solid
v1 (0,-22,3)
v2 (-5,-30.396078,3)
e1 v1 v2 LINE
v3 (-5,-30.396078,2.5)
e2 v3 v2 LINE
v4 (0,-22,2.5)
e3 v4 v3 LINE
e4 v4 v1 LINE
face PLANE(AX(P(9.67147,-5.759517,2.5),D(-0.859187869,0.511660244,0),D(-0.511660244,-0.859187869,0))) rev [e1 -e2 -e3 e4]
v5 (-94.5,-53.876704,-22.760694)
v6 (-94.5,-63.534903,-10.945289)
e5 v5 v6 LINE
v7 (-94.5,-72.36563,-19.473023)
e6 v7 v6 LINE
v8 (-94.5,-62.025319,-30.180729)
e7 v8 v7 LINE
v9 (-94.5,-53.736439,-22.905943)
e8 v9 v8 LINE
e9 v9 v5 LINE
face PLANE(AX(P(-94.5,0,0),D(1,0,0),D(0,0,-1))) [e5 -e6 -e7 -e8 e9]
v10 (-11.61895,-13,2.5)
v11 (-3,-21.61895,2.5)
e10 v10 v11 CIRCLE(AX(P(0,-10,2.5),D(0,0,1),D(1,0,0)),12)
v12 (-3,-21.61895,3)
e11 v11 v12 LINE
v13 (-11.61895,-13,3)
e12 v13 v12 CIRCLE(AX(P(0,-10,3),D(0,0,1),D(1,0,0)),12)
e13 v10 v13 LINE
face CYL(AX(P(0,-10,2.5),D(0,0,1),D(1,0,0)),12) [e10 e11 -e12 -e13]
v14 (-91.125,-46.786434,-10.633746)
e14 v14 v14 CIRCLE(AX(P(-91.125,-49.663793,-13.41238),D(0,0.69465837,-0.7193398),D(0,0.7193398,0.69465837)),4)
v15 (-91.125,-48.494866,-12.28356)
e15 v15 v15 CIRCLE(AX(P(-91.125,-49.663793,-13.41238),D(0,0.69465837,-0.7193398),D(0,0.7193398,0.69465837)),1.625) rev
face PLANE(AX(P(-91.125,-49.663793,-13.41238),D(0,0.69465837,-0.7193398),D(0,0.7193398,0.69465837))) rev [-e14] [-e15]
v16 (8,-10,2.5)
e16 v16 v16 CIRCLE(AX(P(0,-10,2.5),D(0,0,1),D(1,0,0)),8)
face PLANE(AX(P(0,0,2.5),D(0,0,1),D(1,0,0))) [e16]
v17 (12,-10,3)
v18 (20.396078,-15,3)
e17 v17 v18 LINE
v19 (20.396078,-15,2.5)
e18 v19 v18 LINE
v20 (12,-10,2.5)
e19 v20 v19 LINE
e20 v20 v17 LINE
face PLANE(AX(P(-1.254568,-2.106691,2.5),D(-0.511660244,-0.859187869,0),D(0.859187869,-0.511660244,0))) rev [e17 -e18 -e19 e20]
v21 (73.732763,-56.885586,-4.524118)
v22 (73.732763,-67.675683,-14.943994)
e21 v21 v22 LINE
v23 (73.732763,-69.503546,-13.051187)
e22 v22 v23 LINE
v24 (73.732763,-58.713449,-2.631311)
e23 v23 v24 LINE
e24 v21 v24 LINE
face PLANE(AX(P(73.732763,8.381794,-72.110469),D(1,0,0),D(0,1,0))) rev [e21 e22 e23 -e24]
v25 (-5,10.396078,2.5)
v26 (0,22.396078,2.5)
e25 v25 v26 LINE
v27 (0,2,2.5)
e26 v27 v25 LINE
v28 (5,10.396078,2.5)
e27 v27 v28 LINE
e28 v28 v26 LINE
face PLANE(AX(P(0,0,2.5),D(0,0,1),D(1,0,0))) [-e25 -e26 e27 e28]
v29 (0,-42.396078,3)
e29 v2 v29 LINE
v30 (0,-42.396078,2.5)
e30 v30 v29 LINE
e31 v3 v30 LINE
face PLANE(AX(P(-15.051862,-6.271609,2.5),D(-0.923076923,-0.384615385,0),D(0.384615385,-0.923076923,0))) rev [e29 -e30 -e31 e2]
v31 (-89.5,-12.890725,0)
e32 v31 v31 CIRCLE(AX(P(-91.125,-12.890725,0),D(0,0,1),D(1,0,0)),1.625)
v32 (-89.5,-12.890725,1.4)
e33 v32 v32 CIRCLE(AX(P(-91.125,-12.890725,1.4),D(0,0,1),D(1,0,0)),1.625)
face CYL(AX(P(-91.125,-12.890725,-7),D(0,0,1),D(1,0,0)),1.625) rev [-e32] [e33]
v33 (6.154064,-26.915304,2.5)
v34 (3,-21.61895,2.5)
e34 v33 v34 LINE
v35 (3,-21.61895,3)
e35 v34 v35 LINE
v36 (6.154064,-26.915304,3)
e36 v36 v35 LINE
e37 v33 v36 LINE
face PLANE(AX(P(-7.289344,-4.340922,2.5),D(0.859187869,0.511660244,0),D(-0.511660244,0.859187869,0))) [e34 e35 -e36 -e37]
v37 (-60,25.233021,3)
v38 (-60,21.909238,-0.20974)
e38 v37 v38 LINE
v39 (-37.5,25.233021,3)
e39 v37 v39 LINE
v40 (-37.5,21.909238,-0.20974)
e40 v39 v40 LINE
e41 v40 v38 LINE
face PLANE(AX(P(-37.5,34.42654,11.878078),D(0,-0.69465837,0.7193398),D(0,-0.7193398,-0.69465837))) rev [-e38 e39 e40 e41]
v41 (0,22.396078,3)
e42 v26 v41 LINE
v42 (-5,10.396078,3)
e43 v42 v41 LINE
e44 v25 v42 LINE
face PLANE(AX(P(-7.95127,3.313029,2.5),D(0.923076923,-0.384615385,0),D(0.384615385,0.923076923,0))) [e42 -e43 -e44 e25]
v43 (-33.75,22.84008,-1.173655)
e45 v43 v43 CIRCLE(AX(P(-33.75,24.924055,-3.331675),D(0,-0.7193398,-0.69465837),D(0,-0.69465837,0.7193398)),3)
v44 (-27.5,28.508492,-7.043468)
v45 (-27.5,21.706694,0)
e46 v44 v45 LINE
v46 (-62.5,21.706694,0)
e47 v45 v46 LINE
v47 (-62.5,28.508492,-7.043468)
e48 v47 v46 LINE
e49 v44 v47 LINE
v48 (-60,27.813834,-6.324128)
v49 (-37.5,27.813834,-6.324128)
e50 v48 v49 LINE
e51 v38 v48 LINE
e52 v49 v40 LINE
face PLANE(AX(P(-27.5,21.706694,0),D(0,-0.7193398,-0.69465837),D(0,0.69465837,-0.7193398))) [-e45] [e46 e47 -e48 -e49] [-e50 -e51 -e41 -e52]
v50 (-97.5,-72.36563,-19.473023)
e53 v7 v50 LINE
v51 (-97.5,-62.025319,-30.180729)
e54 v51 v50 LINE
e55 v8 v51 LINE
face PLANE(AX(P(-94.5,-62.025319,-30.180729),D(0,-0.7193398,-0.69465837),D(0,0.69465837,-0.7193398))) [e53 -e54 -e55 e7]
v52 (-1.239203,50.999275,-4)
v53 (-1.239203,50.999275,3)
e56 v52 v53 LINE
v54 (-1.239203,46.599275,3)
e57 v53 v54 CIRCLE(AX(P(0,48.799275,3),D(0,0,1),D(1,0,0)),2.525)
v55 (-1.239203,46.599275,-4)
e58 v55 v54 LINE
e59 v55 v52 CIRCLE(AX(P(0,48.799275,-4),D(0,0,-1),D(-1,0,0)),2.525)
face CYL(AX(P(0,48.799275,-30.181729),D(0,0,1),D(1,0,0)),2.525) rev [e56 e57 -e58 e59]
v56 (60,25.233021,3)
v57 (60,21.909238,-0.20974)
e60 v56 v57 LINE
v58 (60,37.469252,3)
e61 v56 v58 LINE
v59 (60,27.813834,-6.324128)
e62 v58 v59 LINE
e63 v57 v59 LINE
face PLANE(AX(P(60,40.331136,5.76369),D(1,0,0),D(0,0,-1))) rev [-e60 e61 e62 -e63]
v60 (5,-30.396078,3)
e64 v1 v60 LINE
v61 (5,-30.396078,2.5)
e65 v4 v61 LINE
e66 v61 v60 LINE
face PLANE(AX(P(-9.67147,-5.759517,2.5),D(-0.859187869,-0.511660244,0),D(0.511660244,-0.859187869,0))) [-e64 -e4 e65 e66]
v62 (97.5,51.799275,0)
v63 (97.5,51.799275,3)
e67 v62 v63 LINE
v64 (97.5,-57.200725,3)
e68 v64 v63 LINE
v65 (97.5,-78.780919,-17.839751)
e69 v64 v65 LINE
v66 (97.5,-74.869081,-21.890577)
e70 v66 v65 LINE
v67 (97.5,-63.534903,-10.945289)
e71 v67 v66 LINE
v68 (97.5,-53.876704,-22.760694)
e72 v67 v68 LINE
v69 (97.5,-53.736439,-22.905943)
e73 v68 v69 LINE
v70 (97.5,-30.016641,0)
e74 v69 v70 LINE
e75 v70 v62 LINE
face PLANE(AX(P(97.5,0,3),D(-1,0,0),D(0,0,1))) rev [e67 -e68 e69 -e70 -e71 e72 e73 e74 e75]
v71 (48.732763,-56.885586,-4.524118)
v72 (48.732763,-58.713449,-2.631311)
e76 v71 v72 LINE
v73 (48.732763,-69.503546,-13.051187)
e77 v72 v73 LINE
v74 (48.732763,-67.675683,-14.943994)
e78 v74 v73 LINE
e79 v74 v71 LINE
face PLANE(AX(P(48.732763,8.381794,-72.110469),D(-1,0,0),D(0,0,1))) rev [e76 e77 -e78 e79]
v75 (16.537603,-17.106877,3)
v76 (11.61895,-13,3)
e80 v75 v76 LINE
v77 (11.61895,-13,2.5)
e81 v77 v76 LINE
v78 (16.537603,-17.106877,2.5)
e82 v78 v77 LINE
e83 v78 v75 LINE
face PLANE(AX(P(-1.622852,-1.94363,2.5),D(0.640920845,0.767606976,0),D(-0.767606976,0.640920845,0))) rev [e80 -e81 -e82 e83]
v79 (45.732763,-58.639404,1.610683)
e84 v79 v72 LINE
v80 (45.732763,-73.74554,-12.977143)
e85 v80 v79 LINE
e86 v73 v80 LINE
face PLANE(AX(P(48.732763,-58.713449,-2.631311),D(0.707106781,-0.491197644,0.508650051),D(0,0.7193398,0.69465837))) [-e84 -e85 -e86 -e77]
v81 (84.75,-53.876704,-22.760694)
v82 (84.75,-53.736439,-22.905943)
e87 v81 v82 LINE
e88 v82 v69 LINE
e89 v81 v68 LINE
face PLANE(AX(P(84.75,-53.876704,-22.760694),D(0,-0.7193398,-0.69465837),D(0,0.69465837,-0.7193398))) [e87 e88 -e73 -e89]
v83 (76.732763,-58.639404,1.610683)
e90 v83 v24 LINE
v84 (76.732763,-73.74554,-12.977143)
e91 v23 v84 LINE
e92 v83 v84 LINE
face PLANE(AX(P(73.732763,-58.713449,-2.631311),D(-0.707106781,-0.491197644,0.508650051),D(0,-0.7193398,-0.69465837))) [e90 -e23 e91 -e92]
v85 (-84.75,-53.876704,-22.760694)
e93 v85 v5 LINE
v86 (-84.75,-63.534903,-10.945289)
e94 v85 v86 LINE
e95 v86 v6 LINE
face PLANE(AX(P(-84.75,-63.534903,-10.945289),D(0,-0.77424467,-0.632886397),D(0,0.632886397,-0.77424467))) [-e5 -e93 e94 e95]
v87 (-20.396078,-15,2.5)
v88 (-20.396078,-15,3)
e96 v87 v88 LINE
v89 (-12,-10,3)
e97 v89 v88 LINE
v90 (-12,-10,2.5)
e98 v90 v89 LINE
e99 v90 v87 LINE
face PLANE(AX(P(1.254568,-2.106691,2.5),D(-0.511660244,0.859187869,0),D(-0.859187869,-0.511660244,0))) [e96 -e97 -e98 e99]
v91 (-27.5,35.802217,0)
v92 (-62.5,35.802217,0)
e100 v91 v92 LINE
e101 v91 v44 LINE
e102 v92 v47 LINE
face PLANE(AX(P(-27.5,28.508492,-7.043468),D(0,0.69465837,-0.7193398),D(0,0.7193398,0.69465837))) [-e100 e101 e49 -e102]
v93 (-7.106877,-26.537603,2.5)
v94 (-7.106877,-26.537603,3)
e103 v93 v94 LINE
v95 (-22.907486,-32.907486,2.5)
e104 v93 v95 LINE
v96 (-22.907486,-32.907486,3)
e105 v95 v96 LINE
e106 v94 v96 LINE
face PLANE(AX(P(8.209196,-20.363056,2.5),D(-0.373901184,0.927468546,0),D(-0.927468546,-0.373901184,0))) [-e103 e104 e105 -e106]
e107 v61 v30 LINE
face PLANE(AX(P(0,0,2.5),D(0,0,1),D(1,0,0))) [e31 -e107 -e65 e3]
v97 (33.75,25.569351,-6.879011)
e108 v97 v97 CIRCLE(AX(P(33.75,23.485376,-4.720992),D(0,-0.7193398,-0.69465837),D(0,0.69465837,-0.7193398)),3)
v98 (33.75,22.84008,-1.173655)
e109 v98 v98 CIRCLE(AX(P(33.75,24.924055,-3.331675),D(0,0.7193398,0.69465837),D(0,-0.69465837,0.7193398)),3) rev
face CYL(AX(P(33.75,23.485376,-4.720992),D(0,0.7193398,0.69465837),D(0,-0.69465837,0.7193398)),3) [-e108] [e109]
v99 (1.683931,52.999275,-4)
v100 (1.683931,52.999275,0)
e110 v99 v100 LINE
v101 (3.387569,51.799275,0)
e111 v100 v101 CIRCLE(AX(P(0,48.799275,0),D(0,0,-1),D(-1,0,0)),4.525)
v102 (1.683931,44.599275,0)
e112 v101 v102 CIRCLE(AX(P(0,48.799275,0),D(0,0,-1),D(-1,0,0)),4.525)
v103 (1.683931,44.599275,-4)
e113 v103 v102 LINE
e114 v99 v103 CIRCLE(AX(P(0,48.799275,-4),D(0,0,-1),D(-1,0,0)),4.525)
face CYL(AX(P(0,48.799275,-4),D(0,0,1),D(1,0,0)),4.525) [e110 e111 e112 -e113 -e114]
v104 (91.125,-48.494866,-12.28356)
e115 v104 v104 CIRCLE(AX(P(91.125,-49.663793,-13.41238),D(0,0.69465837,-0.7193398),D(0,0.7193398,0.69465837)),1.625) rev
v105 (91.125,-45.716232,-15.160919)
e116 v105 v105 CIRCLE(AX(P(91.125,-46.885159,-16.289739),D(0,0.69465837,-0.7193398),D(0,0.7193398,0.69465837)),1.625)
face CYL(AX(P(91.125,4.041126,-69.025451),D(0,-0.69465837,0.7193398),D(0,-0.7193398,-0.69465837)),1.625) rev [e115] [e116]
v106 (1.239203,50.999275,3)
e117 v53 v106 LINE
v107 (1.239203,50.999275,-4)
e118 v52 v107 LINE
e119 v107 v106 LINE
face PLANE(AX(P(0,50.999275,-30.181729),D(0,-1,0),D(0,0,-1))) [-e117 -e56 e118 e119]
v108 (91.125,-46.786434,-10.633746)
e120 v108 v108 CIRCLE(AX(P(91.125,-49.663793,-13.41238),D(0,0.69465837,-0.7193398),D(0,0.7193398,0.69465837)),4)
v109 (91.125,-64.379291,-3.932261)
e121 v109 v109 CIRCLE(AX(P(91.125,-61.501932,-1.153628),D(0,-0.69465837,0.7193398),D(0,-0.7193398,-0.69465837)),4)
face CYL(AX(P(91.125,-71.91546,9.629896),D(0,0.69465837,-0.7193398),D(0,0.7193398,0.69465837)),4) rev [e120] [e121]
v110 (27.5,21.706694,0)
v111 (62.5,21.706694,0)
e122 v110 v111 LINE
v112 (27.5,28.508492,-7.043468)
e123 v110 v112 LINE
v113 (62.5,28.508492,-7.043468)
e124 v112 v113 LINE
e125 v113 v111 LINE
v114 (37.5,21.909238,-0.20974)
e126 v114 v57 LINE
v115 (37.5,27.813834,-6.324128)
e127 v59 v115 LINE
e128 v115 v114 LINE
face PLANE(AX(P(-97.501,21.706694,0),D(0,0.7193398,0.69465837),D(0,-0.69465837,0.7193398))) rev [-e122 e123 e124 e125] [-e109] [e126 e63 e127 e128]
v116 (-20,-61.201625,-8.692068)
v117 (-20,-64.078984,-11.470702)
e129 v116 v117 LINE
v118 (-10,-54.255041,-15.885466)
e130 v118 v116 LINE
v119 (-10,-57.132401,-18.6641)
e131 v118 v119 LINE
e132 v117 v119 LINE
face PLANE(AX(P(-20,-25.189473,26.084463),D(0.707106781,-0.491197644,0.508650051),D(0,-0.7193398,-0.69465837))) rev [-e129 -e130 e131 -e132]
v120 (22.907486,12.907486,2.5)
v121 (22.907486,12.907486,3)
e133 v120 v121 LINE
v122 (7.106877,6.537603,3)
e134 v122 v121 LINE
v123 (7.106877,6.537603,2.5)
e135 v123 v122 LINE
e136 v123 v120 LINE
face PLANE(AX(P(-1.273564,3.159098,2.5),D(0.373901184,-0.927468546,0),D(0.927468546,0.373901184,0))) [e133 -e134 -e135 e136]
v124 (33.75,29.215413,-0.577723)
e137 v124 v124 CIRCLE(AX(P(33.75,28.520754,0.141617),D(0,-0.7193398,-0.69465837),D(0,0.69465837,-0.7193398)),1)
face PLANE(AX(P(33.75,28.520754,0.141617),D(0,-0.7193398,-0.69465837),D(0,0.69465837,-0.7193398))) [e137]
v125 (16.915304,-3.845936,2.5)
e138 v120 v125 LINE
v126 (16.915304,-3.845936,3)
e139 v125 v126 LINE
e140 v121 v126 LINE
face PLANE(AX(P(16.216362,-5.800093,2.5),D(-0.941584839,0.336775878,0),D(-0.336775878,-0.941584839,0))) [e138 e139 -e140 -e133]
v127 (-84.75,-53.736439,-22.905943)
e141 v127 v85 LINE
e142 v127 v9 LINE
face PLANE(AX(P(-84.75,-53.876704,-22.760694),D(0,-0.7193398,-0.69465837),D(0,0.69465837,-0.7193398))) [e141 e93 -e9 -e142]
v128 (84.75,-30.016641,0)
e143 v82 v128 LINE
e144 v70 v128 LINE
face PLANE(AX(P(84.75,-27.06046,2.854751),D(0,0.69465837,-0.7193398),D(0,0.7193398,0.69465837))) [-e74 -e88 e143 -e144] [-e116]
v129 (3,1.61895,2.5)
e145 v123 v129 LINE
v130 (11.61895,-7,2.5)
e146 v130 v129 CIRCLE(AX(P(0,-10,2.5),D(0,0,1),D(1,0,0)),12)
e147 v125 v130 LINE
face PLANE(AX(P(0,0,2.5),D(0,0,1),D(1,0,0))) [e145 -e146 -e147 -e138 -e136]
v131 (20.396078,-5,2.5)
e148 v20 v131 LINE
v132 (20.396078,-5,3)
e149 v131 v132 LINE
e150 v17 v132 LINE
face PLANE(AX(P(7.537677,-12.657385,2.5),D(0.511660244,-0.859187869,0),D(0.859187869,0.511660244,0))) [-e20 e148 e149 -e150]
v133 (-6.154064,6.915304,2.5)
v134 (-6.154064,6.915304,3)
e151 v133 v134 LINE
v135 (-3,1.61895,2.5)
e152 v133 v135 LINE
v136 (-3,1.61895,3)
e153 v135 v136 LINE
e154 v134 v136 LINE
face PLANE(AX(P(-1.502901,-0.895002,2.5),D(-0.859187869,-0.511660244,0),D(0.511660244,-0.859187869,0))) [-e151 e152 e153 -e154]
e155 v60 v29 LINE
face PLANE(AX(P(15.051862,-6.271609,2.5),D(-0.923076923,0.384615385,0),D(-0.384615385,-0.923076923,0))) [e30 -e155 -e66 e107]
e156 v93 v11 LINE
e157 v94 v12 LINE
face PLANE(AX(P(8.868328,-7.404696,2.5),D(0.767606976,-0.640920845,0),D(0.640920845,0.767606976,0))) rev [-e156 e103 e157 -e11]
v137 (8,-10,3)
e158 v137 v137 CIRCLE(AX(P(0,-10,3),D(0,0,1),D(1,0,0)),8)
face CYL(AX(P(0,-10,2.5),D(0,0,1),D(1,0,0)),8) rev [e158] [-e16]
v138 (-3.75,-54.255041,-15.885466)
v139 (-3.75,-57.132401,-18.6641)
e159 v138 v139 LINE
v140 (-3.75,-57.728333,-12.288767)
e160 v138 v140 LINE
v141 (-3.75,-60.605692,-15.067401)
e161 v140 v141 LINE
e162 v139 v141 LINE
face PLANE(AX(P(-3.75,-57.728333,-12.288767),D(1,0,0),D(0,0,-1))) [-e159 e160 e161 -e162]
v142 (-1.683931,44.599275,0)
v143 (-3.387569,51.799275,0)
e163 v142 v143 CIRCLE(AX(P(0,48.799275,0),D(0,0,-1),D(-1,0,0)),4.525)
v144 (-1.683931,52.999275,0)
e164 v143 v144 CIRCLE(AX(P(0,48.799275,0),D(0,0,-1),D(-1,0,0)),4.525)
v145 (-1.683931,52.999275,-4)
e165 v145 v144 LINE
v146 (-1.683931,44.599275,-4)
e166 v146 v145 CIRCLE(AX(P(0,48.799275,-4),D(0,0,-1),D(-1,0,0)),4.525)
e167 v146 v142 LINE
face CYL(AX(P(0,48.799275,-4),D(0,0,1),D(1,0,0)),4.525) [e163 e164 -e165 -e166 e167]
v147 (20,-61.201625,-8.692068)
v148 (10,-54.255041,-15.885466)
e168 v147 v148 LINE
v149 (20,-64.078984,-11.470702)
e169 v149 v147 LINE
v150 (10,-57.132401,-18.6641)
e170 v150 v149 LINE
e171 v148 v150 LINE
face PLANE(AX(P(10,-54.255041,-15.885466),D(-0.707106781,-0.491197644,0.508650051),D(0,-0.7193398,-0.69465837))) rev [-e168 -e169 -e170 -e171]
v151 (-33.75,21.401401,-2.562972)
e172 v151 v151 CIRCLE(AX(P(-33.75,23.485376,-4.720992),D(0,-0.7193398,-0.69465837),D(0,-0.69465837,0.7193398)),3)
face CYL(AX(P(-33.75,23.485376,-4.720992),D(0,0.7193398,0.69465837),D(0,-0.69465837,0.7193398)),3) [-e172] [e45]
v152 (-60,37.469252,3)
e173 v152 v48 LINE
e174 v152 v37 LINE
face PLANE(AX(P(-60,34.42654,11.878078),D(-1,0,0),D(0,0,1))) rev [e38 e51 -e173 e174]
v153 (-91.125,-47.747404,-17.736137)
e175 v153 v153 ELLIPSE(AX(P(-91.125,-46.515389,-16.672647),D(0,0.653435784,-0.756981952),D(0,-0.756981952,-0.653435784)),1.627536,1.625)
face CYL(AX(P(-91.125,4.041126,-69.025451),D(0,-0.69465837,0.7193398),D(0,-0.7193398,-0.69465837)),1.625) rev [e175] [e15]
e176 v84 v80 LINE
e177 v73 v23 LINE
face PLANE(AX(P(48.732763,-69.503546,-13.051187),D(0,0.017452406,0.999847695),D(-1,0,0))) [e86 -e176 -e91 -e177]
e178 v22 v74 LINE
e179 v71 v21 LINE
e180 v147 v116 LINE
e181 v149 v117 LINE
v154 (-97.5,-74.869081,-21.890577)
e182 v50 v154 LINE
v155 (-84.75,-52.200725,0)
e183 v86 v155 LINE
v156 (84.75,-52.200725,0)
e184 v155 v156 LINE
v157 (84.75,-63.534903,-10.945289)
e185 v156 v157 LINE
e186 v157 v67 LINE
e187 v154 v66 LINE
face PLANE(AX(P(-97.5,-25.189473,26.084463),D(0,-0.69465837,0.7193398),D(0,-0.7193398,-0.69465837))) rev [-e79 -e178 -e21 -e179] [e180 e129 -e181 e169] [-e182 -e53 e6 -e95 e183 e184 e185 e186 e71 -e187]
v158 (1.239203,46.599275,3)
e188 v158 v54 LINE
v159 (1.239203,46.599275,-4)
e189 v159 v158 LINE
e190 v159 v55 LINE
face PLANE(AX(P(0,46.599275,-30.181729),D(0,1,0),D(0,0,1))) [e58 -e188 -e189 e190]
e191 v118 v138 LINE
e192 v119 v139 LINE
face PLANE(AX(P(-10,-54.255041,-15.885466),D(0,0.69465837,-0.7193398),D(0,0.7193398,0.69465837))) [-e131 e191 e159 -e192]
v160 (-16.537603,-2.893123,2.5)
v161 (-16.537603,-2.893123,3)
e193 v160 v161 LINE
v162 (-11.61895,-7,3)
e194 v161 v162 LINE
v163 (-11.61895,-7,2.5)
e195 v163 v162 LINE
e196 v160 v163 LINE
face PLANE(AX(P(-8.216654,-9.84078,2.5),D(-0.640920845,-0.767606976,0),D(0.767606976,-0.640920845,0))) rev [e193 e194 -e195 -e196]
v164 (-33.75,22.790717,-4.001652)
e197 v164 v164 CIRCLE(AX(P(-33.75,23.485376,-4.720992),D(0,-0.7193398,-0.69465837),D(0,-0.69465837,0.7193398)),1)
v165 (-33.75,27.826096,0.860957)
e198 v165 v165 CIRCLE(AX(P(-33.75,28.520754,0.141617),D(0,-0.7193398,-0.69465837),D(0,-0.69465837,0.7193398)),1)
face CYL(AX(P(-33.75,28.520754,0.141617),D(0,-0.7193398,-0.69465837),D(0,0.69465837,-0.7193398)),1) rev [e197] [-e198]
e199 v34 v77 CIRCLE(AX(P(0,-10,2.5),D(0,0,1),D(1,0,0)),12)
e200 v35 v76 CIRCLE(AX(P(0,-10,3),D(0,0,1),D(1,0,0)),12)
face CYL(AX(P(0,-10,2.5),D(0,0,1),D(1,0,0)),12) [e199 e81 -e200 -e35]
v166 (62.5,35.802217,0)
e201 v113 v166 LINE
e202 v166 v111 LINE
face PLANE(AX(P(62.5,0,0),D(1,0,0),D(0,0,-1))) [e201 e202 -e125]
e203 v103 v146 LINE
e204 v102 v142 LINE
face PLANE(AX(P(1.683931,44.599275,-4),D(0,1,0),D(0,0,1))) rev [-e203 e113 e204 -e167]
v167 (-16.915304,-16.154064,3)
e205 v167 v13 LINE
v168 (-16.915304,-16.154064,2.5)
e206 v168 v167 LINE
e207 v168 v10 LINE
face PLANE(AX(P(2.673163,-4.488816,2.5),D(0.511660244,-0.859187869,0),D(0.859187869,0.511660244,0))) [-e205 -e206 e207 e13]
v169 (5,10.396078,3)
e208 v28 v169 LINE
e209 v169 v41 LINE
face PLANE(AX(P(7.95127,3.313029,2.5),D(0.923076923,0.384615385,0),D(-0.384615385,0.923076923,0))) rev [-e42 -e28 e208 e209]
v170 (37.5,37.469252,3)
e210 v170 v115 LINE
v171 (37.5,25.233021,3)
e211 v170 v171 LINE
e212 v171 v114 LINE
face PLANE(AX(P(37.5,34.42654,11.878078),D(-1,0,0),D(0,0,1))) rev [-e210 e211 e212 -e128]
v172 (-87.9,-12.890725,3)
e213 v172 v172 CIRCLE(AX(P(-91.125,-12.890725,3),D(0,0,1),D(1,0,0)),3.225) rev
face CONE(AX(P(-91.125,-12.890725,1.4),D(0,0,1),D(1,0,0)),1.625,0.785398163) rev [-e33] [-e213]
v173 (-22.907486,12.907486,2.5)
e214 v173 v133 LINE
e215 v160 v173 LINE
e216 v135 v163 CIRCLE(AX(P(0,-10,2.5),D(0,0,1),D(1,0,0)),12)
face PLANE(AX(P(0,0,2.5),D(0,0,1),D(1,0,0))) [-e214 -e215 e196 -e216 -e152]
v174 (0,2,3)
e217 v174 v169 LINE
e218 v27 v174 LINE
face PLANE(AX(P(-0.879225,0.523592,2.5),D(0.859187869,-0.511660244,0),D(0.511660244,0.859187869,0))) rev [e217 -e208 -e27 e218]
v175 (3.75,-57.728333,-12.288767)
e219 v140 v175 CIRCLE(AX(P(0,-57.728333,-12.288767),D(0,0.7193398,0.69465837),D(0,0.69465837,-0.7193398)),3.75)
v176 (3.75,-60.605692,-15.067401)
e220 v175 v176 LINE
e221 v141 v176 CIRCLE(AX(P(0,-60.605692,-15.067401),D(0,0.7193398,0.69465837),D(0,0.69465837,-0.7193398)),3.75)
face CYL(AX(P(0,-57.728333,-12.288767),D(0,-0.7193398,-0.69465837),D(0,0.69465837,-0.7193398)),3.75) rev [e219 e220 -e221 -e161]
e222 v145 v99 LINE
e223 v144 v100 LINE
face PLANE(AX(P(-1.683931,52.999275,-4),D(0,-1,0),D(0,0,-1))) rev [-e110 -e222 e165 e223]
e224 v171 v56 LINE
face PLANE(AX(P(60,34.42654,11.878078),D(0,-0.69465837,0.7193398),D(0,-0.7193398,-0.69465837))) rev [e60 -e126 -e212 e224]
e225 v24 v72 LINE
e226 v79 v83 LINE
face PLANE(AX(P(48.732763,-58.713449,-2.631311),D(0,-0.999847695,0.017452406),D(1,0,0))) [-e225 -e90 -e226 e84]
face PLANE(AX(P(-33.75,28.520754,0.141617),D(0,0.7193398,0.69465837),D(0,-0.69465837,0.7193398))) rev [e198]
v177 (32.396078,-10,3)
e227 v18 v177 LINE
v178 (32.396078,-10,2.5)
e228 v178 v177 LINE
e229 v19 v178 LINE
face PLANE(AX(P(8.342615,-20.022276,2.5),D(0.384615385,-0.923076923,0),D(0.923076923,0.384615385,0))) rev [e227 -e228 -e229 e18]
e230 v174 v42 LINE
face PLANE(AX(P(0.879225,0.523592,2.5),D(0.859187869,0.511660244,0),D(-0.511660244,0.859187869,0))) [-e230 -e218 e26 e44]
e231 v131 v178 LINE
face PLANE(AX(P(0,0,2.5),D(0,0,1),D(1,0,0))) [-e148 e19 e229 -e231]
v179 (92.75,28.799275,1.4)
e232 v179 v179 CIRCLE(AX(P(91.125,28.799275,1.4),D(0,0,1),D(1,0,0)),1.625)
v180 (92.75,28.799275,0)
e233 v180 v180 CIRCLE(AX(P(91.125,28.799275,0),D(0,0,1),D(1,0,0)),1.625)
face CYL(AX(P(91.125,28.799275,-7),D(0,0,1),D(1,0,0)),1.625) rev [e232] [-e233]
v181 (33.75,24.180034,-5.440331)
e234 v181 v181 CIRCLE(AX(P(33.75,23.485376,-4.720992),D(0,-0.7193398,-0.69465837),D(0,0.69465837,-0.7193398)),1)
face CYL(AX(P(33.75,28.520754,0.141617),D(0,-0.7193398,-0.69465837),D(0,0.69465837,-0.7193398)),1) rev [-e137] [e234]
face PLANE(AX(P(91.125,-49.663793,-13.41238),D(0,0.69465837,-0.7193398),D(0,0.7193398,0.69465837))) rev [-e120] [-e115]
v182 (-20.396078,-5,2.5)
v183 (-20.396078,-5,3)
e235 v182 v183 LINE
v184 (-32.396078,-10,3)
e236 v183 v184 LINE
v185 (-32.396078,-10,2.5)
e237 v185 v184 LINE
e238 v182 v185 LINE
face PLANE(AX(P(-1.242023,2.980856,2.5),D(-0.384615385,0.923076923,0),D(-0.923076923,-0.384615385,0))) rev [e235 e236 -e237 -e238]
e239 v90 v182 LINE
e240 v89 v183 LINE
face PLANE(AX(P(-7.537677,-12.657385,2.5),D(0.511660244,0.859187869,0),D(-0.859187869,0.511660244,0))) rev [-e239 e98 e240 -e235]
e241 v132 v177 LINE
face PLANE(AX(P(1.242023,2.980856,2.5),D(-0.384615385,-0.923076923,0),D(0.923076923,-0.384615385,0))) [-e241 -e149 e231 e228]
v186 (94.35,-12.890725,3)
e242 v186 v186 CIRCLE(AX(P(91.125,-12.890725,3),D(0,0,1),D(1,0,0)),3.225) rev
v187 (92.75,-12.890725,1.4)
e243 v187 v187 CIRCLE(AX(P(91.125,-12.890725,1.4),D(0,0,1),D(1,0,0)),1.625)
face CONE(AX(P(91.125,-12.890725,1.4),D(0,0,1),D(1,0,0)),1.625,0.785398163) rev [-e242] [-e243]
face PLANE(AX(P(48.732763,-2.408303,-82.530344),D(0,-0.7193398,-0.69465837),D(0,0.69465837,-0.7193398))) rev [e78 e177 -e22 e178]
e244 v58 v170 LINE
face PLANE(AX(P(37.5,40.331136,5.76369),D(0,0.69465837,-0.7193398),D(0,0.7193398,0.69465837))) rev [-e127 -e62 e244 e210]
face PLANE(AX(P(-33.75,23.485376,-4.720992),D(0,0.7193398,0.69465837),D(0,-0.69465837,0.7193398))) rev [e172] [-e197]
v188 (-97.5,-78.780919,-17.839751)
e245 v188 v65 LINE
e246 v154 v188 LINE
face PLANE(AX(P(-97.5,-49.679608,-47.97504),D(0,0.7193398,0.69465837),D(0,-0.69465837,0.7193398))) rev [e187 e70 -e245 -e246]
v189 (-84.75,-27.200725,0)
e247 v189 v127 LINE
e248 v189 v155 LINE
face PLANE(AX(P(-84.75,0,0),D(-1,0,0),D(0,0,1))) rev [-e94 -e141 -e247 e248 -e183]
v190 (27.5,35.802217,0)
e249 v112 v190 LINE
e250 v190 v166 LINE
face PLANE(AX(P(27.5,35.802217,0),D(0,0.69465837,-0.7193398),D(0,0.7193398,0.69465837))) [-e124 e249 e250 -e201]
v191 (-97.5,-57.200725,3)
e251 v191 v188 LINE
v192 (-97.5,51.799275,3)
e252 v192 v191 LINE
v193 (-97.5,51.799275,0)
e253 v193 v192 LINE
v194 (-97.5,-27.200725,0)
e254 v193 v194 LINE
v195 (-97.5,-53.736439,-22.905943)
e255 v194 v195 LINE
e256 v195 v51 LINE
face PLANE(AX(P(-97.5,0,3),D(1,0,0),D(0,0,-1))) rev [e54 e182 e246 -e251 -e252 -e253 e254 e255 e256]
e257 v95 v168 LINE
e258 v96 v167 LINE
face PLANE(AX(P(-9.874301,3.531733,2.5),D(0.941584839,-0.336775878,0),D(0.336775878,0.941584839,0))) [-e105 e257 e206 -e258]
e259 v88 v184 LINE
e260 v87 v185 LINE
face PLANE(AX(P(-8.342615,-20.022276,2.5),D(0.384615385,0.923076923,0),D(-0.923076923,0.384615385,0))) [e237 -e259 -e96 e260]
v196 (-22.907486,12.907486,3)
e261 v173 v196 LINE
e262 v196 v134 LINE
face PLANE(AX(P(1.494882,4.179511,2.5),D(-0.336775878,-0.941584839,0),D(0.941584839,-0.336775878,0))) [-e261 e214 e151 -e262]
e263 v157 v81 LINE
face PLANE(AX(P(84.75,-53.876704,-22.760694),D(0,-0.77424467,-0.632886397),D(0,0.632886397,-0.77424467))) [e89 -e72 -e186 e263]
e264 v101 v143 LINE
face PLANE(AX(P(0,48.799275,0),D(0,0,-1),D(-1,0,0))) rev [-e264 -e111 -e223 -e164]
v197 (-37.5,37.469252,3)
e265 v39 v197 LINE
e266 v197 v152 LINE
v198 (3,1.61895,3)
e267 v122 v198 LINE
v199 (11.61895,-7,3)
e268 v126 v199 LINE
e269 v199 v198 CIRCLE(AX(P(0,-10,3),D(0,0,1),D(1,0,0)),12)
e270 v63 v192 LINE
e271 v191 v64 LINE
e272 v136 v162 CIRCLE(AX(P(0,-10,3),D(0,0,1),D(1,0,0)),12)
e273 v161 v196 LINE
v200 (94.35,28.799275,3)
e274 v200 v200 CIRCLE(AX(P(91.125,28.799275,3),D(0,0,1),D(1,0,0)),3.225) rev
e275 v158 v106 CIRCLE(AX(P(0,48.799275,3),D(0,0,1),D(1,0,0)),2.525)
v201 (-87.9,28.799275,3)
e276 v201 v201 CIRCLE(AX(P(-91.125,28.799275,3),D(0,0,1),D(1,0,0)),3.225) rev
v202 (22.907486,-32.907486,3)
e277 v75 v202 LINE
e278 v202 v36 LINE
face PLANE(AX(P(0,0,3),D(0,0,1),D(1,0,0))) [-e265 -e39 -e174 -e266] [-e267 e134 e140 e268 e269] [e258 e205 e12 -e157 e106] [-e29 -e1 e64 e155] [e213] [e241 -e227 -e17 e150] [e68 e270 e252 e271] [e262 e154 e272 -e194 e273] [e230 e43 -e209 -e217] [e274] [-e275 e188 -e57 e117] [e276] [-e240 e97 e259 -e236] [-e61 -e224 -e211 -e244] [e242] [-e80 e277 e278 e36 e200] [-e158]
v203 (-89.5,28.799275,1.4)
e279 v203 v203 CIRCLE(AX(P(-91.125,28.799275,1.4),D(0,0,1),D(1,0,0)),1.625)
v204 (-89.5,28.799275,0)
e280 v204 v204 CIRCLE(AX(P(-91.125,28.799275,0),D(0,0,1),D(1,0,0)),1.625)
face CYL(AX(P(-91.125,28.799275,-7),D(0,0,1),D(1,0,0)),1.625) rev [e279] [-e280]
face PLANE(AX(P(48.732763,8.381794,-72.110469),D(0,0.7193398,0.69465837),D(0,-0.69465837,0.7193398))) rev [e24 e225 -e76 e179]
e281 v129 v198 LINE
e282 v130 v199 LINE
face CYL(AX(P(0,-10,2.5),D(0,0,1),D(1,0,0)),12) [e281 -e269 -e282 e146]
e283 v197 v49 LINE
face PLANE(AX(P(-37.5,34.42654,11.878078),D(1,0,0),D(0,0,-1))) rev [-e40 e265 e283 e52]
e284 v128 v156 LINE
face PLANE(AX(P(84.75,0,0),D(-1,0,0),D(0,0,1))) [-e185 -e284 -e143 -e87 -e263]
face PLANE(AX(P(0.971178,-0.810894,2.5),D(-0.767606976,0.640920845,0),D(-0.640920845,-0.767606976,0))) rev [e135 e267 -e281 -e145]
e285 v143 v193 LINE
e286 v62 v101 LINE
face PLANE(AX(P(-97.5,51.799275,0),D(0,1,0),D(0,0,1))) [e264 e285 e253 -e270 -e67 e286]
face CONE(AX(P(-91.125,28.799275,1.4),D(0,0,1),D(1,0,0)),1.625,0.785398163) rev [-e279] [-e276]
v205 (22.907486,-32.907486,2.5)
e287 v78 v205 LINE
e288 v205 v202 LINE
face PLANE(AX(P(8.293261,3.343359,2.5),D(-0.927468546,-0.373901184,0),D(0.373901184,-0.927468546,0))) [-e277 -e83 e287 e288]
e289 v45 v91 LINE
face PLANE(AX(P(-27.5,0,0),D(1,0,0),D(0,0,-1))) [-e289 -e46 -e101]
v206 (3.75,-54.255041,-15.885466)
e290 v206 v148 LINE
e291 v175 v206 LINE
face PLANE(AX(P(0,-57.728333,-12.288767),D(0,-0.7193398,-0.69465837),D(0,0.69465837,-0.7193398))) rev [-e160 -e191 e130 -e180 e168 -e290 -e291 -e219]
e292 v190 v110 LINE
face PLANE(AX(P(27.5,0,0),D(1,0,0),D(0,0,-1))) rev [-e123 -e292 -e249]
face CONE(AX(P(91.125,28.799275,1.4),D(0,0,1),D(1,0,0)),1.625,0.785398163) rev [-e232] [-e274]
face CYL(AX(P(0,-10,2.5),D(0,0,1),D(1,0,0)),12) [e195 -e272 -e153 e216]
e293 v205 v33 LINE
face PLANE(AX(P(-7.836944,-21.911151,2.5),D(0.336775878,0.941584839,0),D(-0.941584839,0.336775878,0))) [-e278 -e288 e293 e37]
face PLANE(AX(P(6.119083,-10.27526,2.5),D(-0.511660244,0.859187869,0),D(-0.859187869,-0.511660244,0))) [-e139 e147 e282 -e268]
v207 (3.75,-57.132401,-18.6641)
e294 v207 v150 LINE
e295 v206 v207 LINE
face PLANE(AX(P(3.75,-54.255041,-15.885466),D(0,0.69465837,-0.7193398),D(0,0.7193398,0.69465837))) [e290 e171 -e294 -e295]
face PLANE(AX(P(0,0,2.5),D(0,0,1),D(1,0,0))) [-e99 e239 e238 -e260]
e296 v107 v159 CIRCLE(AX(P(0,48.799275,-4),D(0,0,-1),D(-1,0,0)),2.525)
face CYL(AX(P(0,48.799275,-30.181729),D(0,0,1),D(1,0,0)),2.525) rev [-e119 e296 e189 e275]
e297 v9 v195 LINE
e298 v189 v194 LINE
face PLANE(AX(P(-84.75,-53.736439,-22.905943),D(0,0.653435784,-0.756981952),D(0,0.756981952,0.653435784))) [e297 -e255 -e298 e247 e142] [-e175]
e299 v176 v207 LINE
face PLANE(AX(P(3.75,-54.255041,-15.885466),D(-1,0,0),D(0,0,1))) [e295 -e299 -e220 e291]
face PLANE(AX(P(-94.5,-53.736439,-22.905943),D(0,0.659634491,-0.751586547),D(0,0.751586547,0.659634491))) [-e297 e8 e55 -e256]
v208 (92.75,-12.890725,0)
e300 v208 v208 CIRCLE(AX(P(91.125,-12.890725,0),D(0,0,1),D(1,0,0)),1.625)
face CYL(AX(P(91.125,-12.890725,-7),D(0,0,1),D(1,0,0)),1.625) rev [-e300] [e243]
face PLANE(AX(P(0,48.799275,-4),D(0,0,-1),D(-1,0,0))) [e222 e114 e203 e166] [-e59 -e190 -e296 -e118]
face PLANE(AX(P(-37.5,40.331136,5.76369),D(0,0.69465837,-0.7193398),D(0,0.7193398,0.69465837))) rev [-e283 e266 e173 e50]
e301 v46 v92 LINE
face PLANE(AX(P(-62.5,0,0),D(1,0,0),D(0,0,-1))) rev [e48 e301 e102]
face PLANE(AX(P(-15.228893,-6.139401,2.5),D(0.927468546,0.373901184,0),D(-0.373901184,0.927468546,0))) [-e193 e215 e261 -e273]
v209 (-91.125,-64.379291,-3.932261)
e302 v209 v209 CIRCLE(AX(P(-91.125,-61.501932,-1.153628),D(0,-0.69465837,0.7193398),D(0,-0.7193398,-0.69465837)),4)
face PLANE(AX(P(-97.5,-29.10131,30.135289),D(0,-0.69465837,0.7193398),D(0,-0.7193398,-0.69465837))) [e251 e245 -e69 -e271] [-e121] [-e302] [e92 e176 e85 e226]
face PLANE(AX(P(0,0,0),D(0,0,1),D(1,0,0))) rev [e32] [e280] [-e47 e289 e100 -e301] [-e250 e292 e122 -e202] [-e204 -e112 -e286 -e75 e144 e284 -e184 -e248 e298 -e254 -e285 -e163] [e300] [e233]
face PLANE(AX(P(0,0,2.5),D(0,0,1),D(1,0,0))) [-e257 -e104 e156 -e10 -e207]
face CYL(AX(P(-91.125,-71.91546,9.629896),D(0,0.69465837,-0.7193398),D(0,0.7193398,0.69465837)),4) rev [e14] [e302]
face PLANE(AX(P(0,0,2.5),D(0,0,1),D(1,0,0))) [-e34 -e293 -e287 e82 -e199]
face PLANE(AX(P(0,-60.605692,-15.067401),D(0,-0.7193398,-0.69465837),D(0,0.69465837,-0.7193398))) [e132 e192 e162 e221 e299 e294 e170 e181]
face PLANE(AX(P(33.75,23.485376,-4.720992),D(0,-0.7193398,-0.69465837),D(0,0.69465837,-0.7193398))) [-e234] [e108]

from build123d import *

# Parameters (mm, degrees)
CROQUIS1_W                  = 195
CROQUIS1_H                  = 38
CROQUIS1_R                  = 1.625
SALIENTE_EXTRUIR1_DEPTH     = 3
CROQUIS8_W                  = 195
CROQUIS8_H                  = 3
SALIENTE_EXTRUIR5_DEPTH     = 5
CROQUIS9_W                  = 195
CROQUIS9_H                  = 3
SALIENTE_EXTRUIR6_DEPTH     = 5
SALIENTE_EXTRUIR7_START     = -35
SALIENTE_EXTRUIR7_DEPTH     = 35
CORTAR_EXTRUIR4_DEPTH       = 106.247150057
CORTAR_EXTRUIR4_DEPTH_BACK  = 106.247150057
CROQUIS11_W                 = 22.5
CROQUIS11_H                 = 8.5
CORTAR_EXTRUIR5_REACH       = 168.011
CROQUIS13_R                 = 1
CORTAR_EXTRUIR6_DEPTH       = 5
SALIENTE_EXTRUIR8_START     = -35
SALIENTE_EXTRUIR8_DEPTH     = 35
CORTAR_EXTRUIR7_DEPTH       = 105.093743192
CORTAR_EXTRUIR7_DEPTH_BACK  = 105.093743192
CROQUIS16_W                 = 22.5
CROQUIS16_H                 = 8.5
CROQUIS17_R                 = 1
CORTAR_EXTRUIR8_DEPTH       = 5
CROQUIS18_R                 = 1.625
CORTAR_EXTRUIR9_DEPTH       = 10
CROQUIS19_W                 = 195
CROQUIS19_H                 = 24
SALIENTE_EXTRUIR9_DEPTH     = 3
CROQUIS20_W                 = 195
CROQUIS20_H                 = 28.69
SALIENTE_EXTRUIR10_DEPTH    = 3
CROQUIS22_W                 = 195
CROQUIS22_H                 = 8.799275258
CROQUIS22_W_2               = 10.817472397
CROQUIS22_H_2               = 9.408992843
CROQUIS22_W_3               = 11.057059306
SALIENTE_EXTRUIR11_DEPTH    = 3
CROQUIS23_R                 = 1.625
CORTAR_EXTRUIR10_DEPTH      = 10
CORTAR_EXTRUIR11_DEPTH      = 202.885550157
CORTAR_EXTRUIR11_DEPTH_BACK = 202.885550157
CROQUIS25_W                 = 6.04831912
CROQUIS25_H                 = 14.575165693
SALIENTE_EXTRUIR15_DEPTH    = 12.75
SALIENTE_EXTRUIR16_DEPTH    = 12.75
CROQUIS27_W                 = 3
CROQUIS27_H                 = 30
SALIENTE_EXTRUIR13_DEPTH    = 195
SALIENTE_EXTRUIR14_DEPTH    = 195
CORTAR_EXTRUIR12_DEPTH      = 124.960633848
CORTAR_EXTRUIR12_DEPTH_BACK = 124.960633848
CROQUIS31_R                 = 1.625
SALIENTE_EXTRUIR17_DEPTH    = 12.75
SALIENTE_EXTRUIR18_DEPTH    = 12.75
CORTAR_EXTRUIR15_DEPTH      = 124.840994831
CORTAR_EXTRUIR15_DEPTH_BACK = 124.840994831
CROQUIS39_R                 = 1.625
CORTAR_EXTRUIR16_START      = -4
CROQUIS40_R                 = 4
CORTAR_EXTRUIR16_DEPTH      = 120.840994831
SALIENTE_EXTRUIR19_START    = -15
SALIENTE_EXTRUIR19_DEPTH    = 4
CHAFL_N1_SIZE               = 10
SALIENTE_EXTRUIR20_DEPTH    = 3
CORTAR_EXTRUIR17_REACH      = 142.318
CROQUIS47_W                 = 25
CROQUIS47_H                 = 15
CORTAR_EXTRUIR18_REACH      = 131.667
CROQUIS49_R                 = 8
CORTAR_EXTRUIR19_DEPTH      = 0.5
CHAFL_N2_SIZE               = 3
SALIENTE_EXTRUIR22_DEPTH    = 4
CHAFL_N3_SIZE               = 1.6
SALIENTE_EXTRUIR23_START    = 2
CROQUIS52_R                 = 3
CROQUIS52_R_2               = 1
SALIENTE_EXTRUIR23_DEPTH    = 2


with BuildPart() as part:
    # Croquis1 → Saliente-Extruir1 (new body)
    with BuildSketch(Plane.XY):
        with Locations((0, 19)):
            Rectangle(CROQUIS1_W, CROQUIS1_H)
        with Locations((91.125, 15)):
            Circle(CROQUIS1_R, mode=Mode.SUBTRACT)
        with Locations(Location((-91.125, 15, 0), (0, 0, 180))):
            Circle(CROQUIS1_R, mode=Mode.SUBTRACT)
    extrude(amount=SALIENTE_EXTRUIR1_DEPTH)

    # Croquis8 → Saliente-Extruir5 (add)
    with BuildSketch(Plane.XZ):
        with Locations((0, 1.5)):
            Rectangle(CROQUIS8_W, CROQUIS8_H)
    extrude(amount=SALIENTE_EXTRUIR5_DEPTH)

    # Croquis9 → Saliente-Extruir6 (add)
    with BuildSketch(Plane(origin=(0, 38, 0), x_dir=(1, 0, 0), z_dir=(0, 1, 0))):
        with Locations((0, -1.5)):
            Rectangle(CROQUIS9_W, CROQUIS9_H)
    extrude(amount=SALIENTE_EXTRUIR6_DEPTH)

    # Croquis10 → Saliente-Extruir7 (add)
    with BuildSketch(Plane(origin=(97.5, 0, 0), x_dir=(0, 0, -1), z_dir=(1, 0, 0)).offset(SALIENTE_EXTRUIR7_START)):
        Polygon((0, 35.802217302), (10.516760097, 24.911793418), (1.165342693, 15.881234602), (0, 14.755876245), align=None)
    extrude(amount=-SALIENTE_EXTRUIR7_DEPTH)

    # Croquis11 → Cortar-Extruir4 (cut, two sides: drawn at the far end of the back side and taken through both)
    with BuildSketch(Plane(origin=(0, 7.63542445, 7.373443682), x_dir=(1, 0, 0), z_dir=(0, -0.7193398003386503, -0.6946583704589981)).offset(-CORTAR_EXTRUIR4_DEPTH_BACK)):
        with Locations((48.75, -19.62030993)):
            Rectangle(CROQUIS11_W, CROQUIS11_H)
    extrude(amount=CORTAR_EXTRUIR4_DEPTH + CORTAR_EXTRUIR4_DEPTH_BACK, mode=Mode.SUBTRACT)

    # Croquis12 → Cortar-Extruir5 (cut, up to next)
    with BuildSketch(Plane(origin=(62.5, 0, 0), x_dir=(0, 0, -1), z_dir=(1, 0, 0)), mode=Mode.PRIVATE) as cortar_extruir5_sk1:
        Polygon((10.516760097, 24.911793418), (0, 14.755876245), (0, 21.7066942), (7.043468245, 28.50849242), align=None)
    cortar_extruir5_tool1 = extrude(cortar_extruir5_sk1.sketch, amount=-CORTAR_EXTRUIR5_REACH, mode=Mode.PRIVATE) & part.part
    add(cortar_extruir5_tool1.solids().sort_by_distance((62.5, 22.296862, -4.447307))[0], mode=Mode.SUBTRACT)

    # Croquis13 → Cortar-Extruir6 (cut)
    with BuildSketch(Plane(origin=(0, 11.232123451, 10.846735534), x_dir=(1, 0, 0), z_dir=(0, -0.7193398003386495, -0.694658370458999))):
        with Locations(Location((33.75, -19.71030993, 0), (0, 0, 270))):
            Circle(CROQUIS13_R)
    extrude(amount=-CORTAR_EXTRUIR6_DEPTH, mode=Mode.SUBTRACT)

    # Croquis14 → Saliente-Extruir8 (add)
    with BuildSketch(Plane.ZY.offset(97.5).offset(SALIENTE_EXTRUIR8_START)):
        Polygon((0, 21.7066942), (-7.043468245, 28.50849242), (0, 35.802217302), align=None)
    extrude(amount=-SALIENTE_EXTRUIR8_DEPTH)

    # Croquis16 → Cortar-Extruir7 (cut, two sides: drawn at the far end of the back side and taken through both)
    with BuildSketch(Plane(origin=(0, 11.232123451, 10.846735534), x_dir=(1, 0, 0), z_dir=(0, -0.7193398003386495, -0.694658370458999)).offset(-CORTAR_EXTRUIR7_DEPTH_BACK)):
        with Locations((-48.75, -19.62030993)):
            Rectangle(CROQUIS16_W, CROQUIS16_H)
    extrude(amount=CORTAR_EXTRUIR7_DEPTH + CORTAR_EXTRUIR7_DEPTH_BACK, mode=Mode.SUBTRACT)

    # Croquis17 → Cortar-Extruir8 (cut)
    with BuildSketch(Plane(origin=(0, 11.232123451, 10.846735534), x_dir=(1, 0, 0), z_dir=(0, -0.7193398003386495, -0.694658370458999))):
        with Locations(Location((-33.75, -19.71030993, 0), (0, 0, 90))):
            Circle(CROQUIS17_R)
    extrude(amount=-CORTAR_EXTRUIR8_DEPTH, mode=Mode.SUBTRACT)

    # Croquis18 → Cortar-Extruir9 (cut)
    with BuildSketch(Plane.XY.offset(3)):
        with Locations((91.125, 23)):
            Circle(CROQUIS18_R)
        with Locations((-91.125, 23)):
            Circle(CROQUIS18_R)
    extrude(amount=-CORTAR_EXTRUIR9_DEPTH, mode=Mode.SUBTRACT)

    # Croquis19 → Saliente-Extruir9 (add)
    with BuildSketch(Plane.XY.offset(3)):
        with Locations((0, 7)):
            Rectangle(CROQUIS19_W, CROQUIS19_H)
    extrude(amount=-SALIENTE_EXTRUIR9_DEPTH)

    # Croquis20 → Saliente-Extruir10 (add)
    with BuildSketch(Plane.XY.offset(3)):
        with Locations((0, -19.345)):
            Rectangle(CROQUIS20_W, CROQUIS20_H)
    extrude(amount=-SALIENTE_EXTRUIR10_DEPTH)

    # Croquis22 → Saliente-Extruir11 (add)
    with BuildSketch(Plane.XY.offset(3)):
        with Locations((0, 47.399637629)):
            Rectangle(CROQUIS22_W, CROQUIS22_H)
        with Locations((-92.091263802, 22.840486177)):
            Rectangle(CROQUIS22_W_2, CROQUIS22_H_2)
        with Locations((91.971470347, 22.840486177)):
            Rectangle(CROQUIS22_W_3, CROQUIS22_H_2)
    extrude(amount=-SALIENTE_EXTRUIR11_DEPTH)

    # Croquis23 → Cortar-Extruir10 (cut)
    with BuildSketch(Plane.XY.offset(3)):
        with Locations((-91.125, 28.799275258)):
            Circle(CROQUIS23_R)
        with Locations((-91.125, -12.890724742)):
            Circle(CROQUIS23_R)
        with Locations((91.125, -12.890724742)):
            Circle(CROQUIS23_R)
        with Locations((91.125, 28.799275258)):
            Circle(CROQUIS23_R)
    extrude(amount=-CORTAR_EXTRUIR10_DEPTH, mode=Mode.SUBTRACT)

    # Croquis25 → Cortar-Extruir11 (cut, two sides: drawn at the far end of the back side and taken through both)
    with BuildSketch(Plane.ZY.offset(97.5).offset(-CORTAR_EXTRUIR11_DEPTH_BACK)):
        with Locations((3.02415956, -34.488307588)):
            Rectangle(CROQUIS25_W, CROQUIS25_H)
    extrude(amount=CORTAR_EXTRUIR11_DEPTH + CORTAR_EXTRUIR11_DEPTH_BACK, mode=Mode.SUBTRACT)

    # Croquis29 → Saliente-Extruir15 (add)
    with BuildSketch(Plane(origin=(97.5, 0, 0), x_dir=(0, 0, -1), z_dir=(1, 0, 0))):
        Polygon((-3, -27.200724742), (22.760693721, -53.876703995), (22.905942566, -53.736438816), (-2.854751155, -27.060459563), align=None)
    extrude(amount=-SALIENTE_EXTRUIR15_DEPTH)

    # Croquis30 → Saliente-Extruir16 (add)
    with BuildSketch(Plane.ZY.offset(97.5)):
        Polygon((0, -27.200724742), (3, -27.200724742), (-22.760693721, -53.876703995), (-22.905942566, -53.736438816), align=None)
    extrude(amount=-SALIENTE_EXTRUIR16_DEPTH)

    # Croquis27 → Saliente-Extruir13 (add)
    with BuildSketch(Plane(origin=(97.5, 0, 0), x_dir=(0, 0, -1), z_dir=(1, 0, 0))):
        with Locations((-1.5, -42.200724742)):
            Rectangle(CROQUIS27_W, CROQUIS27_H)
    extrude(amount=-SALIENTE_EXTRUIR13_DEPTH)

    # Croquis28 → Saliente-Extruir14 (add)
    with BuildSketch(Plane(origin=(97.5, 0, 0), x_dir=(0, 0, -1), z_dir=(1, 0, 0))):
        Polygon((21.890577426, -74.869081254), (0, -52.200724742), (0, -57.200724742), (-3, -57.200724742), (17.839751114, -78.780918752), align=None)
        Polygon((0, -57.200724742), (0, -52.200724742), (-3, -55.097791067), (-3, -57.200724742), align=None)
    extrude(amount=-SALIENTE_EXTRUIR14_DEPTH)

    # Croquis31 → Cortar-Extruir12 (cut, two sides: drawn at the far end of the back side and taken through both)
    with BuildSketch(Plane(origin=(0, -14.62480281, 15.144426643), x_dir=(1, 0, 0), z_dir=(0, -0.694658370458999, 0.7193398003386496)).offset(-CORTAR_EXTRUIR12_DEPTH_BACK)):
        with Locations(Location((91.125, -45.042164488, 0), (0, 0, 270))):
            Circle(CROQUIS31_R)
        with Locations(Location((-91.125, -45.042164488, 0), (0, 0, 270))):
            Circle(CROQUIS31_R)
    extrude(amount=CORTAR_EXTRUIR12_DEPTH + CORTAR_EXTRUIR12_DEPTH_BACK, mode=Mode.SUBTRACT)

    # Croquis32 → Saliente-Extruir17 (add)
    with BuildSketch(Plane(origin=(97.5, 0, 0), x_dir=(0, 0, -1), z_dir=(1, 0, 0))):
        Polygon((0, -30.307315684), (22.760693721, -53.876703995), (10.945288713, -63.534902998), (0, -52.200724742), align=None)
    extrude(amount=-SALIENTE_EXTRUIR17_DEPTH)

    # Croquis33 → Saliente-Extruir18 (add)
    with BuildSketch(Plane.ZY.offset(97.5)):
        Polygon((0, -30.307315684), (0, -52.200724742), (-10.945288713, -63.534902998), (-22.760693721, -53.876703995), align=None)
    extrude(amount=-SALIENTE_EXTRUIR18_DEPTH)

    # Croquis39 → Cortar-Extruir15 (cut, two sides: drawn at the far end of the back side and taken through both)
    with BuildSketch(Plane(origin=(0, -14.484537631, 14.999177798), x_dir=(-1, 0, 0), z_dir=(0, 0.6946583704589991, -0.7193398003386495)).offset(-CORTAR_EXTRUIR15_DEPTH_BACK)):
        with Locations(Location((91.125, -45.042164488, 0), (0, 0, 270))):
            Circle(CROQUIS39_R)
        with Locations(Location((-91.125, -45.042164488, 0), (0, 0, 270))):
            Circle(CROQUIS39_R)
    extrude(amount=CORTAR_EXTRUIR15_DEPTH + CORTAR_EXTRUIR15_DEPTH_BACK, mode=Mode.SUBTRACT)

    # Croquis40 → Cortar-Extruir16 (cut, through all)
    with BuildSketch(Plane(origin=(0, -14.484537631, 14.999177798), x_dir=(-1, 0, 0), z_dir=(0, 0.6946583704589991, -0.7193398003386495)).offset(CORTAR_EXTRUIR16_START)):
        with Locations(Location((-91.125, -45.042164488, 0), (0, 0, 90))):
            Circle(CROQUIS40_R)
        with Locations(Location((91.125, -45.042164488, 0), (0, 0, 90))):
            Circle(CROQUIS40_R)
    extrude(amount=-CORTAR_EXTRUIR16_DEPTH, mode=Mode.SUBTRACT)

    # Croquis43 → Saliente-Extruir19 (add)
    with BuildSketch(Plane(origin=(0, -49.679608393, -47.975040162), x_dir=(1, 0, 0), z_dir=(0, -0.7193398003386499, -0.6946583704589987)).offset(SALIENTE_EXTRUIR19_START)):
        with BuildLine():
            Line((-10, 36.261670386), (10, 36.261670386))
            Line((10, 36.261670386), (10, 26.261670386))
            Line((10, 26.261670386), (3.75, 26.261670386))
            Line((3.75, 26.261670386), (3.75, 31.261670386))
            ThreePointArc((3.75, 31.261670386), (0, 35.011670386), (-3.75, 31.261670386))
            Line((-3.75, 31.261670386), (-3.75, 26.261670386))
            Line((-3.75, 26.261670386), (-10, 26.261670386))
            Line((-10, 26.261670386), (-10, 36.261670386))
        make_face()
    extrude(amount=-SALIENTE_EXTRUIR19_DEPTH)

    # Chaflán1
    chafl_n1_edges = [part.edges().sort_by_distance(p)[0] for p in [
        (-10, -62.640304648, -10.081385129),
        (10, -62.640304648, -10.081385129),
    ]]
    chamfer(chafl_n1_edges, length=CHAFL_N1_SIZE - 0.0001)  # a hair under: the kernel refuses the full size

    # Croquis44 → Saliente-Extruir20 (add)
    with BuildSketch(Plane.ZY.offset(97.5)):
        Polygon((-30.180728616, -62.025319097), (-19.473022927, -72.365630285), (-10.945288713, -63.534902998), (-22.905942566, -53.736438816), align=None)
    extrude(amount=-SALIENTE_EXTRUIR20_DEPTH)

    # Croquis47 → Cortar-Extruir17 (cut, up to next)
    with BuildSketch(Plane(origin=(0, -29.101310359, 30.135289048), x_dir=(1, 0, 0), z_dir=(0, -0.6946583704589991, 0.7193398003386494)), mode=Mode.PRIVATE) as cortar_extruir17_sk1:
        with Locations((61.232763252, -51.562782804)):
            Rectangle(CROQUIS47_W, CROQUIS47_H)
    cortar_extruir17_tool1 = extrude(cortar_extruir17_sk1.sketch, amount=-CORTAR_EXTRUIR17_REACH, mode=Mode.PRIVATE) & part.part
    add(cortar_extruir17_tool1.solids().sort_by_distance((61.232763, -66.192472, -5.68323))[0], mode=Mode.SUBTRACT)

    # Croquis48 → Cortar-Extruir18 (cut, up to next)
    with BuildSketch(Plane.XY.offset(3), mode=Mode.PRIVATE) as cortar_extruir18_sk1:
        with BuildLine():
            Line((1.239203373, 50.999275258), (-1.239203373, 50.999275258))
            ThreePointArc((-1.239203373, 50.999275258), (-2.431884027, 49.478661068), (-2.2, 47.560071885))
            ThreePointArc((-2.2, 47.560071885), (-1.785444622, 47.013830635), (-1.239203373, 46.599275258))
            Line((-1.239203373, 46.599275258), (1.239203373, 46.599275258))
            ThreePointArc((1.239203373, 46.599275258), (2.525, 48.799275258), (1.239203373, 50.999275258))
        make_face()
    cortar_extruir18_tool1 = extrude(cortar_extruir18_sk1.sketch, amount=-CORTAR_EXTRUIR18_REACH, mode=Mode.PRIVATE) & part.part
    add(cortar_extruir18_tool1.solids().sort_by_distance((0, 48.799275, 3))[0], mode=Mode.SUBTRACT)

    # Croquis49 → Cortar-Extruir19 (cut)
    with BuildSketch(Plane.XY.offset(3)):
        with BuildLine():
            ThreePointArc((-11.618950039, -7), (-8.485281374, -1.514718626), (-3, 1.618950039))
            Line((-3, 1.618950039), (-6.154064033, 6.9153036))
            Line((-6.154064033, 6.9153036), (-22.907486476, 12.907486476))
            Line((-22.907486476, 12.907486476), (-16.537602787, -2.893123467))
            Line((-16.537602787, -2.893123467), (-11.618950039, -7))
        make_face()
        Polygon((0, 2), (-5, 10.396078054), (0, 22.396078054), (5, 10.396078054), align=None)
        with BuildLine():
            Line((7.106876533, 6.537602787), (3, 1.618950039))
            ThreePointArc((3, 1.618950039), (8.485281374, -1.514718626), (11.618950039, -7))
            Line((11.618950039, -7), (16.9153036, -3.845935967))
            Line((16.9153036, -3.845935967), (22.907486476, 12.907486476))
            Line((22.907486476, 12.907486476), (7.106876533, 6.537602787))
        make_face()
        Polygon((12, -10), (20.396078054, -15), (32.396078054, -10), (20.396078054, -5), align=None)
        with BuildLine():
            Line((16.537602787, -17.106876533), (11.618950039, -13))
            ThreePointArc((11.618950039, -13), (8.485281374, -18.485281374), (3, -21.618950039))
            Line((3, -21.618950039), (6.154064033, -26.9153036))
            Line((6.154064033, -26.9153036), (22.907486476, -32.907486476))
            Line((22.907486476, -32.907486476), (16.537602787, -17.106876533))
        make_face()
        with Locations((0, -10)):
            Circle(CROQUIS49_R)
        Polygon((0, -22), (-5, -30.396078054), (0, -42.396078054), (5, -30.396078054), align=None)
        with BuildLine():
            ThreePointArc((-3, -21.618950039), (-8.485281374, -18.485281374), (-11.618950039, -13))
            Line((-11.618950039, -13), (-16.9153036, -16.154064033))
            Line((-16.9153036, -16.154064033), (-22.907486476, -32.907486476))
            Line((-22.907486476, -32.907486476), (-7.106876533, -26.537602787))
            Line((-7.106876533, -26.537602787), (-3, -21.618950039))
        make_face()
        Polygon((-12, -10), (-20.396078054, -5), (-32.396078054, -10), (-20.396078054, -15), align=None)
    extrude(amount=-CORTAR_EXTRUIR19_DEPTH, mode=Mode.SUBTRACT)

    # Chaflán2
    chafl_n2_edges = [part.edges().sort_by_distance(p)[0] for p in [
        (48.732763252, -66.192472247, -5.683229631),
        (61.232763252, -71.587520749, -10.893167409),
        (73.732763252, -66.192472247, -5.683229631),
        (61.232763252, -60.797423744, -0.473291852),
    ]]
    chamfer(chafl_n2_edges, length=CHAFL_N2_SIZE)

    # Croquis51 → Saliente-Extruir22 (add)
    with BuildSketch(Plane(origin=(0, 0, 0), x_dir=(-1, 0, 0), z_dir=(0, 0, -1))):
        with BuildLine():
            Line((-1.683931412, 44.599275258), (1.683931412, 44.599275258))
            ThreePointArc((1.683931412, 44.599275258), (4.525, 48.799275258), (1.683931412, 52.999275258))
            Line((1.683931412, 52.999275258), (-1.683931412, 52.999275258))
            ThreePointArc((-1.683931412, 52.999275258), (-4.525, 48.799275258), (-1.683931412, 44.599275258))
        make_face()
        with BuildLine():
            Line((-1.239203373, 46.599275258), (1.239203373, 46.599275258))
            ThreePointArc((1.239203373, 46.599275258), (2.525, 48.799275258), (1.239203373, 50.999275258))
            Line((1.239203373, 50.999275258), (-1.239203373, 50.999275258))
            ThreePointArc((-1.239203373, 50.999275258), (-2.525, 48.799275258), (-1.239203373, 46.599275258))
        make_face(mode=Mode.SUBTRACT)
    extrude(amount=SALIENTE_EXTRUIR22_DEPTH)

    # Chaflán3
    chafl_n3_edges = [part.edges().sort_by_distance(p)[0] for p in [
        (89.5, 28.799275258, 3),
        (89.5, -12.890724742, 3),
        (-92.75, -12.890724742, 3),
        (-92.75, 28.799275258, 3),
    ]]
    chamfer(chafl_n3_edges, length=CHAFL_N3_SIZE)

    # Croquis52 → Saliente-Extruir23 (add)
    # profile 1 of 2: a face of its own
    with BuildSketch(Plane(origin=(0, 11.232123451, 10.846735534), x_dir=(1, 0, 0), z_dir=(0, -0.7193398003386494, -0.694658370458999)).offset(SALIENTE_EXTRUIR23_START)):
        with Locations(Location((33.75, -19.71030993, 0), (0, 0, 90))):
            Circle(CROQUIS52_R)
        with Locations(Location((33.75, -19.71030993, 0), (0, 0, 270))):
            Circle(CROQUIS52_R_2, mode=Mode.SUBTRACT)
    # profile 2 of 2: a face of its own
    with BuildSketch(Plane(origin=(0, 11.232123451, 10.846735534), x_dir=(1, 0, 0), z_dir=(0, -0.7193398003386494, -0.694658370458999)).offset(SALIENTE_EXTRUIR23_START)):
        with Locations(Location((-33.75, -19.71030993, 0), (0, 0, 90))):
            Circle(CROQUIS52_R)
        with Locations(Location((-33.75, -19.71030993, 0), (0, 0, 90))):
            Circle(CROQUIS52_R_2, mode=Mode.SUBTRACT)
    extrude(amount=-SALIENTE_EXTRUIR23_DEPTH)


solid = part.part
